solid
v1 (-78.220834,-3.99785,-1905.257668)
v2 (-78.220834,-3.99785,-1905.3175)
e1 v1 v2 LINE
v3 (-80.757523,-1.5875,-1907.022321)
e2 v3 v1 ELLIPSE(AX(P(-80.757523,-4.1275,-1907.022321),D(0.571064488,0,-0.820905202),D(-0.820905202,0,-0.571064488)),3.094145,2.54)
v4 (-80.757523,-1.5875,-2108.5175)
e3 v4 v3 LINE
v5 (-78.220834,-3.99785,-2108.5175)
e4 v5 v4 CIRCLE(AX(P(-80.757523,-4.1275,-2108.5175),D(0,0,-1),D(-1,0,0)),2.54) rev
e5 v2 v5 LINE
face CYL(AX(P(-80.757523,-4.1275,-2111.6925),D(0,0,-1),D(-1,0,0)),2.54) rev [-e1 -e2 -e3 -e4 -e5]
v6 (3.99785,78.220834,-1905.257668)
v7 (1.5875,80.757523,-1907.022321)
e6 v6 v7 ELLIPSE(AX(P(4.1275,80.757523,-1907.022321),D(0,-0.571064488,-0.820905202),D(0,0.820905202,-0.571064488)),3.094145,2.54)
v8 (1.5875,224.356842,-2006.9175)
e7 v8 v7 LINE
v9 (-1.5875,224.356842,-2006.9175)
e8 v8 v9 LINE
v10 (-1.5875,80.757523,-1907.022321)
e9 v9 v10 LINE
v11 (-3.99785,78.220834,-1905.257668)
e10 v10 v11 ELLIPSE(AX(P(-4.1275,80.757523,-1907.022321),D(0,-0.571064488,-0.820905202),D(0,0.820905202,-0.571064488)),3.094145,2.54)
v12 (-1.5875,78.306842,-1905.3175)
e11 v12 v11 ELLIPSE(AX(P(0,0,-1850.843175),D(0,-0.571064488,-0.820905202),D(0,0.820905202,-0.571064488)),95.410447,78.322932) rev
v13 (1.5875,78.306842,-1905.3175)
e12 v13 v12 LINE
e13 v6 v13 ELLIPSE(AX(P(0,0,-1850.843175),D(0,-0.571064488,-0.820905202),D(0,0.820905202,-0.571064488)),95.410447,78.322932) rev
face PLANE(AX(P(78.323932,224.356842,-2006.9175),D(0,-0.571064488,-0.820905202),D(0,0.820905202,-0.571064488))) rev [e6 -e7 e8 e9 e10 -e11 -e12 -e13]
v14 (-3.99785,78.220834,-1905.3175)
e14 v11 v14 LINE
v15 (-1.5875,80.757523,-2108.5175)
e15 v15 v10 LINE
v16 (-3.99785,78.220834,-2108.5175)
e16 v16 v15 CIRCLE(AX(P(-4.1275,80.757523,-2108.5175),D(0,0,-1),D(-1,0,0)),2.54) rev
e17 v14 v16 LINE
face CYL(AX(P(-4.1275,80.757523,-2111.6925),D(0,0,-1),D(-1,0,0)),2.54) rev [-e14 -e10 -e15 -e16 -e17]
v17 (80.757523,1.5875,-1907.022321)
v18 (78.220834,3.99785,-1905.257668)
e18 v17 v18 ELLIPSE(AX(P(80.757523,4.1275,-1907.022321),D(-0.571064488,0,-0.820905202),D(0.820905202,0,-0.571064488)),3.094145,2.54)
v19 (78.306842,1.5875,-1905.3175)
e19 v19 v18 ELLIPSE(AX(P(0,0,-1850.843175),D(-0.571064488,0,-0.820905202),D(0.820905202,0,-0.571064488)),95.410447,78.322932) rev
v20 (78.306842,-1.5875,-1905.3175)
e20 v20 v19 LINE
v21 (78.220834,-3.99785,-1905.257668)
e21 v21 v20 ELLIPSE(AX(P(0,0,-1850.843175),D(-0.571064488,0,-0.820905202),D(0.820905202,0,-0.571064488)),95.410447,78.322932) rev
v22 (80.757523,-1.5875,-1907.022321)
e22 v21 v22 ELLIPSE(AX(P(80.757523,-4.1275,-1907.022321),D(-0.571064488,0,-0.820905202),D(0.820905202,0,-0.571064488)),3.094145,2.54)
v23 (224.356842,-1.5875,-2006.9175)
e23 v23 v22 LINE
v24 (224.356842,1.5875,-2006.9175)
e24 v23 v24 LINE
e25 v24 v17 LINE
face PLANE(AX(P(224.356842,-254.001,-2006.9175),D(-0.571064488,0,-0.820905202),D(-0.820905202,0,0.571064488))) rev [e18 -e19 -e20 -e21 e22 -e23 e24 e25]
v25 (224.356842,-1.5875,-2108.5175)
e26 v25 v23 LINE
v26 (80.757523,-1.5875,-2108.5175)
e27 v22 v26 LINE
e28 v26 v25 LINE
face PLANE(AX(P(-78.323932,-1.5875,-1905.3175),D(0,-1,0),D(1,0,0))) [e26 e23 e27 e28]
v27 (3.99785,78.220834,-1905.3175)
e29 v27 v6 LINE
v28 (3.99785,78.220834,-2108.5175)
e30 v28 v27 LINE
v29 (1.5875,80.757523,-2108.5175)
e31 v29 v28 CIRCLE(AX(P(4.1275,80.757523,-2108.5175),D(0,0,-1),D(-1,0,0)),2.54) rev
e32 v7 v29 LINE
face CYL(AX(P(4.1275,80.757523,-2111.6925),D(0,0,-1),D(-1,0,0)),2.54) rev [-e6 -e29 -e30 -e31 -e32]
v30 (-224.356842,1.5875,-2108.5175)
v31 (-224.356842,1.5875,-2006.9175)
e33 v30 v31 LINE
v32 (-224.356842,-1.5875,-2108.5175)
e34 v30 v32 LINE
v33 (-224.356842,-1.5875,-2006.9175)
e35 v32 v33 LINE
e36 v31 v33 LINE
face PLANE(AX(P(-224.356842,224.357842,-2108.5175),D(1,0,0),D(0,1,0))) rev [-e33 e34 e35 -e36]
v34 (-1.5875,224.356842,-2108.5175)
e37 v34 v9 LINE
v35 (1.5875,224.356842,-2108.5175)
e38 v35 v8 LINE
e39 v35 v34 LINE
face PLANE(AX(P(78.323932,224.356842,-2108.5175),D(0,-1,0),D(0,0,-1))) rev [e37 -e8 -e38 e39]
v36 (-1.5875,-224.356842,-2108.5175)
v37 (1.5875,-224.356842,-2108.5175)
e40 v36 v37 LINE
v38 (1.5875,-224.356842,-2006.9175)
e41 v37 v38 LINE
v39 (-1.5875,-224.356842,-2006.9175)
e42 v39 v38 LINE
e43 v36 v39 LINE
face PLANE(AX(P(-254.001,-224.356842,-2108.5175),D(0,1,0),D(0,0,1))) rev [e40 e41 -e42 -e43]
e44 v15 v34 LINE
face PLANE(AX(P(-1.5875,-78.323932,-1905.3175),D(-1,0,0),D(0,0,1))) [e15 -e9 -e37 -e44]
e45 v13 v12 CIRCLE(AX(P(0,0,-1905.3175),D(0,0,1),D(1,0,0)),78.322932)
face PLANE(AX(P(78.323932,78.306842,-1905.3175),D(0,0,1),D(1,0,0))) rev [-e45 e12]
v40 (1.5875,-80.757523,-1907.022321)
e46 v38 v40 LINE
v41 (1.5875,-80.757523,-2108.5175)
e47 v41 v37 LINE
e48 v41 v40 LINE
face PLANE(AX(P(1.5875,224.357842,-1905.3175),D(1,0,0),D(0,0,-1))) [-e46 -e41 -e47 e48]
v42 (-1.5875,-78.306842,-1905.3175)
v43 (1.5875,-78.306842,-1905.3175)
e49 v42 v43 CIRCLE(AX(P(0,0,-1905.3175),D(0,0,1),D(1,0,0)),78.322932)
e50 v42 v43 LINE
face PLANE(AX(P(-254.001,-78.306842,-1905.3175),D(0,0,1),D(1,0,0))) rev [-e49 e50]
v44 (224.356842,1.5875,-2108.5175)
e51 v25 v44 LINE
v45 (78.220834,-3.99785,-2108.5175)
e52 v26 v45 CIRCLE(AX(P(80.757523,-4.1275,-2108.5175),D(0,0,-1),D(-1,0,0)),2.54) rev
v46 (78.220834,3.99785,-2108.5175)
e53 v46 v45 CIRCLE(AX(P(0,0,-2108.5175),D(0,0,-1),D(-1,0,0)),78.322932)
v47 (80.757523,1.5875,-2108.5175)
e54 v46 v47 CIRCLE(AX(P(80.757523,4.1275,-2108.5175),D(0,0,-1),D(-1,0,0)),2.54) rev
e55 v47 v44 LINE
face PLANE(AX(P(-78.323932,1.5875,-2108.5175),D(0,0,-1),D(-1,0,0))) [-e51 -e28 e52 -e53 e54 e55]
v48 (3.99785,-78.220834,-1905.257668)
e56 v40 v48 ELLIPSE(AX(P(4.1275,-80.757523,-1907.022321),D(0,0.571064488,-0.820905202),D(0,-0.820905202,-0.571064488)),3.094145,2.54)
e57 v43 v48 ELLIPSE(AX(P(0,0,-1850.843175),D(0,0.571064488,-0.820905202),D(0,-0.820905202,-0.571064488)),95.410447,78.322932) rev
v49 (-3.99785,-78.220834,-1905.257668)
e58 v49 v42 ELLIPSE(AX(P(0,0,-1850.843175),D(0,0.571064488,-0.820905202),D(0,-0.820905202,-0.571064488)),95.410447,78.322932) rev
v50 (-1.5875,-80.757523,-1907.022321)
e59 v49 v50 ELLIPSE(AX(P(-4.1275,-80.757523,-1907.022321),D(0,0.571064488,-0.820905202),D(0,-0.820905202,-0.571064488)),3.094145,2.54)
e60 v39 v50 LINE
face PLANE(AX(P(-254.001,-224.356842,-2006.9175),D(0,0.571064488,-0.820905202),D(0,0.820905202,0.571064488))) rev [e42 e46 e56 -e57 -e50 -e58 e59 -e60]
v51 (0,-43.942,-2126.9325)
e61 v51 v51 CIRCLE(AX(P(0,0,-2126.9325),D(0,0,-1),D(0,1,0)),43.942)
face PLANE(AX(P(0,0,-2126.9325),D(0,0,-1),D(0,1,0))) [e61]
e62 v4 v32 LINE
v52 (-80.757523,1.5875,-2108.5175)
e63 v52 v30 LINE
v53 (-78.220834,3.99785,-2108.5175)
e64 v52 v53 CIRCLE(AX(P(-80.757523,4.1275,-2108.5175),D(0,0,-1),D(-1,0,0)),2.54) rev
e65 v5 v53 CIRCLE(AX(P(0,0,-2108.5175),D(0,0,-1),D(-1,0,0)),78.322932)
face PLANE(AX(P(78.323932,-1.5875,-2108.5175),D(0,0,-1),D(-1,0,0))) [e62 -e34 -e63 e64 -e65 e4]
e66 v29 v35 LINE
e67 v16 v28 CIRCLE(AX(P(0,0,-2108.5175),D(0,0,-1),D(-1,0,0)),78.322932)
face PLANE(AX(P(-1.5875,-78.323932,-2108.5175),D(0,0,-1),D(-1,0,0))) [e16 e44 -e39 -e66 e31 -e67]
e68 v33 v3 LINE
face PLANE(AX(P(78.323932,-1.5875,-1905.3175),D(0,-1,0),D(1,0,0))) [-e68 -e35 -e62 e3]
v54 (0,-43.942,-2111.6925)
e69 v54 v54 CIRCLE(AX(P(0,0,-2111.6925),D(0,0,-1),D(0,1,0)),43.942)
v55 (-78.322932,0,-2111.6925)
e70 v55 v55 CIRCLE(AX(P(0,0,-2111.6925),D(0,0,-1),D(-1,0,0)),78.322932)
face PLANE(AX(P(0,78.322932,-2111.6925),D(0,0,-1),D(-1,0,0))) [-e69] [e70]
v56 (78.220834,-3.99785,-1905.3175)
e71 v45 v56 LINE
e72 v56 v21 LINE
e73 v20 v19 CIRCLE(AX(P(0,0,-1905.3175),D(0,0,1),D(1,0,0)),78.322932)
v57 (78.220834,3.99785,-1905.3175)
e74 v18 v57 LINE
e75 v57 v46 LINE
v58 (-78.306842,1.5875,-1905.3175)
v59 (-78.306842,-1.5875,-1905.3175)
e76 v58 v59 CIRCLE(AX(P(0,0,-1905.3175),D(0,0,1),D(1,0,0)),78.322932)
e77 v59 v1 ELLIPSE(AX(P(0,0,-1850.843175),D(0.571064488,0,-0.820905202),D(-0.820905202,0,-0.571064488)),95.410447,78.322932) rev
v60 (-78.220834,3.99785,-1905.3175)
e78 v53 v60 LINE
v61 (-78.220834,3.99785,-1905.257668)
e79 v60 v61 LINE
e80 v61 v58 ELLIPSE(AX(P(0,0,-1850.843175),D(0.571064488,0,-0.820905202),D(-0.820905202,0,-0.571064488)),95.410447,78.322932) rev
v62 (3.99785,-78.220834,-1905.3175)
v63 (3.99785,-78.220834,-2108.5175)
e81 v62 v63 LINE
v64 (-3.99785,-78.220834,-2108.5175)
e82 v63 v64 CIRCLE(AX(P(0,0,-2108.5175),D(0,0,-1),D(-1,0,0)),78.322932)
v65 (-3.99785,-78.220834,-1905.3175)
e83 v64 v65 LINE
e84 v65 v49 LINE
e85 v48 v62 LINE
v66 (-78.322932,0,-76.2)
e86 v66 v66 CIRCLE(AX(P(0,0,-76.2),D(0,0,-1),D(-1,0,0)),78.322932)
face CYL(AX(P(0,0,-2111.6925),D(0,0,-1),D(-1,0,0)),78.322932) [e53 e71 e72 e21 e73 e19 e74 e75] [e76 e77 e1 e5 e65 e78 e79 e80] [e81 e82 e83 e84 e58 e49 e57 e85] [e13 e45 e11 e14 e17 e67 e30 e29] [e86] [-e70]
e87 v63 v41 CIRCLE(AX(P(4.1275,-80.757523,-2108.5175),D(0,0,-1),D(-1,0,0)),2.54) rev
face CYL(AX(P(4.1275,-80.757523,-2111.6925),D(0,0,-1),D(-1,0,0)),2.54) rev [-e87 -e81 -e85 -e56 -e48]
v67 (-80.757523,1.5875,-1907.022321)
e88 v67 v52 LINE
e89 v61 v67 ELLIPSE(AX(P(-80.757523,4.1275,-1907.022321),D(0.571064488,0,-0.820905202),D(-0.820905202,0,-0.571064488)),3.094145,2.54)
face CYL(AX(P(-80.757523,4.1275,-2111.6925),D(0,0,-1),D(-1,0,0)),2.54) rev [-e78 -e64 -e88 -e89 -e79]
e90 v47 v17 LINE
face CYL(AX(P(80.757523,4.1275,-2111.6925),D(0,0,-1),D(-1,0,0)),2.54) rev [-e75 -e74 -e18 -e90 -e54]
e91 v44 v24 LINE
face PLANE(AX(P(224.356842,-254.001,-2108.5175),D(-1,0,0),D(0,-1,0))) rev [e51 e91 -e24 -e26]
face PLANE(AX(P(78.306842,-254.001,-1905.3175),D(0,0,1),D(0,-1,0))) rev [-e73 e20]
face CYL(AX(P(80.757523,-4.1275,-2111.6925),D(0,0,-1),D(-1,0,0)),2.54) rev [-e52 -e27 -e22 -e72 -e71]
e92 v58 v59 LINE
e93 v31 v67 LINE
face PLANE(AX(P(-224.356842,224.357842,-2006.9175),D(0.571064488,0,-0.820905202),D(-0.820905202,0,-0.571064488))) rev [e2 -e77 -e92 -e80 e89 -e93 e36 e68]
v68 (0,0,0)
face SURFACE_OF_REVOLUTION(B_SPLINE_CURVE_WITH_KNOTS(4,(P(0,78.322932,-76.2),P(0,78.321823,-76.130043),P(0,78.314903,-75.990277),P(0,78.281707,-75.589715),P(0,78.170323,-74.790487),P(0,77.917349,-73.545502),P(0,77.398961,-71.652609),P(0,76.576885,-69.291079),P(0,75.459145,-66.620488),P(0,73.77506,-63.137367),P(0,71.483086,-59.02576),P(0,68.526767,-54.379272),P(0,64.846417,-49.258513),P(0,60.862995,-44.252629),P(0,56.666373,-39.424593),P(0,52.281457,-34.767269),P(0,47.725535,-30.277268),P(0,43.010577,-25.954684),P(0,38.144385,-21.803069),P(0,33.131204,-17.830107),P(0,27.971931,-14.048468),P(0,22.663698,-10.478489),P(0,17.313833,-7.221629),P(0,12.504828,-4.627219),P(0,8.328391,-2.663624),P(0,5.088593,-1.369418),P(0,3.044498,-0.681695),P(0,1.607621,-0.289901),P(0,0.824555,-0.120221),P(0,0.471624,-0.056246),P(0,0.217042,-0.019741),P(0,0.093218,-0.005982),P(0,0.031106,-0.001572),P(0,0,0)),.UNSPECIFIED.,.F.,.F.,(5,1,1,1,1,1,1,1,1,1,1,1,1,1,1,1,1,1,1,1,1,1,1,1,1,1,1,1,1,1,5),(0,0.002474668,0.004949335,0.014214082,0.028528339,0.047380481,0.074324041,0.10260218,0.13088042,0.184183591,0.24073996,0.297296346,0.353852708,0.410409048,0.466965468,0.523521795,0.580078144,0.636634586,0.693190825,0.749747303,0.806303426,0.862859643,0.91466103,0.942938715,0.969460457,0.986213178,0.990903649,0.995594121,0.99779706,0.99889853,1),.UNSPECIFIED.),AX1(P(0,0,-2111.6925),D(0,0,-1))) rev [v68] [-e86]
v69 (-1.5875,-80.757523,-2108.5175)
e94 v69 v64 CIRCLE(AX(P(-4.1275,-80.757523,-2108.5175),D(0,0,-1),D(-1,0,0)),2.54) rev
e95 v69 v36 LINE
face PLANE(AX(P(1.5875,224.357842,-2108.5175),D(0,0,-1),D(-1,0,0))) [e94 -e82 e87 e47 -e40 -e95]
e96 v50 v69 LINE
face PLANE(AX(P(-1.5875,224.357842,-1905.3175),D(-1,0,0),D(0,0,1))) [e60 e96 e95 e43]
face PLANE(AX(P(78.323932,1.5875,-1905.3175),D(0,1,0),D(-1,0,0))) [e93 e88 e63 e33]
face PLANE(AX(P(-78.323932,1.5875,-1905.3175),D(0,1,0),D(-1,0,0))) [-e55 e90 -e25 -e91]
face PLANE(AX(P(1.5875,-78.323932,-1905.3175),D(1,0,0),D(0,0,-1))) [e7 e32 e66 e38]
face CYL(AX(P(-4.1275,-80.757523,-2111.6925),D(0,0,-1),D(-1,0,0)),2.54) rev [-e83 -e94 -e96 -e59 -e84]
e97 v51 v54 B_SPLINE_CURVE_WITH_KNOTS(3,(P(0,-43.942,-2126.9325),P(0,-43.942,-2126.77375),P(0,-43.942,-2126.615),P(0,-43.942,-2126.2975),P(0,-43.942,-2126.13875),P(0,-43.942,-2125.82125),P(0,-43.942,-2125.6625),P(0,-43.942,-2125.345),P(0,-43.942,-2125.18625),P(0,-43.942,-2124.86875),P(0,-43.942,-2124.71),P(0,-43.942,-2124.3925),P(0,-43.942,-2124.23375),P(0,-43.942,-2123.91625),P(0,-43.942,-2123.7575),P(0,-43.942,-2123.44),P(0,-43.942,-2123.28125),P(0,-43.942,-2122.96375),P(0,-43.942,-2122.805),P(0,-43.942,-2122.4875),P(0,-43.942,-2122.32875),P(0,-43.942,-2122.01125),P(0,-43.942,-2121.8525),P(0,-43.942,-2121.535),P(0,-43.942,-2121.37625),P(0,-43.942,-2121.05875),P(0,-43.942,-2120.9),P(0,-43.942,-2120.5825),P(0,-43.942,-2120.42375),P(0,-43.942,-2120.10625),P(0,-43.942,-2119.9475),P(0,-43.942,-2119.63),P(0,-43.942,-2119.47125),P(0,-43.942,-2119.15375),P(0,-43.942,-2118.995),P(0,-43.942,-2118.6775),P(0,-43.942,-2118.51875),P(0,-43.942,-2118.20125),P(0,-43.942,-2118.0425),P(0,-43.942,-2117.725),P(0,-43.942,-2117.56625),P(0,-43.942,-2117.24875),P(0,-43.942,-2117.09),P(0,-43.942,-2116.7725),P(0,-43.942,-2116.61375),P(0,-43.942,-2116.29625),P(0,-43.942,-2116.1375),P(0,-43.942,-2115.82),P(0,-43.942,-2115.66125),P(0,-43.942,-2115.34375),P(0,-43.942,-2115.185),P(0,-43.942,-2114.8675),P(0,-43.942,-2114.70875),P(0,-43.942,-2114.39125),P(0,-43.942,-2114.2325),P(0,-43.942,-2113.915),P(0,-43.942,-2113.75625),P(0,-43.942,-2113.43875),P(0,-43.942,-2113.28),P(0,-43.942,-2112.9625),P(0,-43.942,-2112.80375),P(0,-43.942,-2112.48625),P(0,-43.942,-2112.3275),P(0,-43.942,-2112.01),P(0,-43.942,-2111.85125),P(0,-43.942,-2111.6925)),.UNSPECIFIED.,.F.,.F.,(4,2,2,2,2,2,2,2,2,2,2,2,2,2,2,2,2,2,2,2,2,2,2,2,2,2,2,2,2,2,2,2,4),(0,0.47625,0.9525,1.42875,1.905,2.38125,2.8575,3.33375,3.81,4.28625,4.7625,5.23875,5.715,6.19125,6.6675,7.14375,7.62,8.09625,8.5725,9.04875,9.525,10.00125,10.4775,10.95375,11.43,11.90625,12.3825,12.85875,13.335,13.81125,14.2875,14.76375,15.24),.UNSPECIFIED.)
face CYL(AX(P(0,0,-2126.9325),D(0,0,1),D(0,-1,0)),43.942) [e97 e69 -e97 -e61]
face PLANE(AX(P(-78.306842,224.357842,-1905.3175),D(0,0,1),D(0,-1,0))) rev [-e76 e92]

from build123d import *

# Parameters (mm, degrees)
SKETCH3_R                = 43.942
BOSS_EXTRUDE1_DEPTH      = 15.24
BOSS_EXTRUDE2_REACH      = 2156.162
BOSS_EXTRUDE2_END_RADIUS = 78.322932
SKETCH4_W                = 3.175
SKETCH4_H                = 203.2
CUT_EXTRUDE1_REACH       = 2145.535
FILLET1_R                = 2.54
CIRPATTERN1_COUNT        = 4
FILLET1_OF_CIRPATTERN1_R = 2.54


with BuildPart() as part:
    # Sketch2 → Revolve1 (revolve)
    with BuildSketch(Plane(origin=(0, 0, 0), x_dir=(0, 0, -1), z_dir=(1, 0, 0)), mode=Mode.PRIVATE) as revolve1_sk:
        with BuildLine():
            Line((76.2, 78.322932), (2111.6925, 78.322932))
            Line((2111.6925, 78.322932), (2111.6925, 0))
            Line((2111.6925, 0), (0, 0))
            add(Edge.make_bspline(
                [(0, 0), (0.00157185, 0.031106382), (0.00598179, 0.093218427), (0.019741162, 0.217041654), (0.056245749, 0.471623897), (0.120220676, 0.824555102), (0.289900607, 1.607620967), (0.681695021, 3.044497502), (1.369417811, 5.088592926), (2.663624448, 8.328390532), (4.627219491, 12.504828431), (7.221628503, 17.313832891), (10.478488809, 22.663697626), (14.048468312, 27.97193092), (17.830107282, 33.131203754), (21.803068789, 38.144384751), (25.954684106, 43.010577273), (30.277267993, 47.72553477), (34.76726888, 52.281456881), (39.424593478, 56.666373482), (44.252629149, 60.862995207), (49.25851273, 64.846416869), (54.379271658, 68.526766678), (59.025760285, 71.483086359), (63.137367168, 73.775059871), (66.620488281, 75.459145189), (69.291079417, 76.576884505), (71.652609302, 77.398960624), (73.545502358, 77.917349185), (74.790486934, 78.170322816), (75.589714748, 78.281706661), (75.99027716, 78.31490275), (76.130043485, 78.321823203), (76.2, 78.322932)],
                knots=[0, 0, 0, 0, 0, 0.00110147, 0.00220294, 0.004405879, 0.009096351, 0.013786822, 0.030539543, 0.057061285, 0.08533897, 0.137140357, 0.193696574, 0.250252697, 0.306809175, 0.363365414, 0.419921856, 0.476478205, 0.533034532, 0.589590952, 0.646147292, 0.702703654, 0.75926004, 0.815816409, 0.86911958, 0.89739782, 0.925675959, 0.952619519, 0.971471661, 0.985785918, 0.995050665, 0.997525332, 1, 1, 1, 1, 1], degree=4))
        make_face()
    revolve(revolve1_sk.sketch.rotate(Axis((0, 0, -2111.6925), (0, 0, 1)), 90), axis=Axis((0, 0, -2111.6925), (0, 0, 1)))

    # Sketch3 → Boss-Extrude1 (add)
    with BuildSketch(Plane(origin=(0, 0, -2111.6925), x_dir=(-1, 0, 0), z_dir=(0, 0, -1))):
        with Locations(Location((0, 0, 0), (0, 0, 270))):
            Circle(SKETCH3_R)
    extrude(amount=BOSS_EXTRUDE1_DEPTH)

    # Boss-Extrude2: up to this cylinder (the profile starts outside it)
    boss_extrude2_end = Plane(origin=(0, 0, -2006.9175), z_dir=(0, 0, -1)) * Cylinder(BOSS_EXTRUDE2_END_RADIUS, 4469.969864, mode=Mode.PRIVATE)
    # Sketch4 → Boss-Extrude2 (add, up to the surface)
    with BuildSketch(Plane(origin=(0, 254, 0), x_dir=(1, 0, 0), z_dir=(0, 1, 0)), mode=Mode.PRIVATE) as boss_extrude2_sk1:
        with Locations((0, 2006.9175)):
            Rectangle(SKETCH4_W, SKETCH4_H)
    boss_extrude2_tool1 = extrude(boss_extrude2_sk1.sketch, amount=-BOSS_EXTRUDE2_REACH, mode=Mode.PRIVATE) - boss_extrude2_end
    boss_extrude2 = boss_extrude2_tool1.solids().sort_by_distance((0, 254, -2006.9175))[0]
    add(boss_extrude2)

    # Sketch5 → Cut-Extrude1 (cut, up to next)
    with BuildSketch(Plane.ZY.offset(1.5875), mode=Mode.PRIVATE) as cut_extrude1_sk1:
        Polygon((-2108.5175, 224.356842107), (-2006.9175, 224.356842107), (-1905.3175, 78.306842107), (-1905.3175, 254), (-2108.5175, 254), align=None)
    cut_extrude1_tool1 = extrude(cut_extrude1_sk1.sketch, amount=-CUT_EXTRUDE1_REACH, mode=Mode.PRIVATE) & part.part
    cut_extrude1 = cut_extrude1_tool1.solids().sort_by_distance((-1.5875, 204.128915, -1969.534252))[0]
    add(cut_extrude1, mode=Mode.SUBTRACT)

    # Fillet1
    # the kernel refuses this fillet: 2.54 mm, written as the material it adds along each edge
    with BuildSketch(Plane(origin=(-1.5875, 78.306842107, -1899.190797857), x_dir=(-0.9993639751499004, -0.03566013422001241, 0), z_dir=(0, 0, -1))) as fillet1_piece_1_section:
        with BuildLine():
            CenterArc((2.450992889, 2.539698904), FILLET1_R, 182.043608468, 87.074170625)
            Line((-0.087391608, 2.449122163), (0, 0))
            ThreePointArc((0, 0), (1.205942189, 0.009284527), (2.411884379, 0))
        make_face()
    fillet1_piece_1 = extrude(amount=209.326702143, mode=Mode.PRIVATE)
    fillet1_piece_1 = split(fillet1_piece_1, bisect_by=Plane(origin=(-3.095055571, 78.248638535, -1905.277010558), z_dir=(0, -0.5710644881985995, -0.8209052017854874)), keep=Keep.TOP, mode=Mode.PRIVATE)
    add(fillet1_piece_1)
    with BuildSketch(Plane(origin=(1.5875, 78.306842107, -1899.190797857), x_dir=(0.9993639751499004, -0.035660134220013434, 0), z_dir=(0, 0, -1))) as fillet1_piece_2_section:
        with BuildLine():
            CenterArc((2.450992889, -2.539698904), FILLET1_R, 90.882220907, 87.074170625)
            Line((-0.087391608, -2.449122163), (0, 0))
            ThreePointArc((0, 0), (1.205942189, -0.009284527), (2.411884379, 0))
        make_face()
    fillet1_piece_2 = extrude(amount=209.326702143, mode=Mode.PRIVATE)
    fillet1_piece_2 = split(fillet1_piece_2, bisect_by=Plane(origin=(3.095055571, 78.248638535, -1905.277010558), z_dir=(0, -0.5710644881985995, -0.8209052017854874)), keep=Keep.TOP, mode=Mode.PRIVATE)
    add(fillet1_piece_2)

    # CirPattern1: Boss-Extrude2, Cut-Extrude1 ×4 about axis
    cirpattern1_axis = Axis((0, 0, 0), (0, 0, 1))
    add([boss_extrude2.rotate(cirpattern1_axis, i * 360 / CIRPATTERN1_COUNT) for i in range(1, CIRPATTERN1_COUNT)])
    add([cut_extrude1.rotate(cirpattern1_axis, i * 360 / CIRPATTERN1_COUNT) for i in range(1, CIRPATTERN1_COUNT)], mode=Mode.SUBTRACT)

    # Fillet1 of CirPattern1
    # the kernel refuses this fillet: 2.54 mm, written as the material it adds along each edge
    with BuildSketch(Plane(origin=(-78.306842107, -1.5875, -1899.190797857), x_dir=(0.03566013422001848, -0.9993639751499002, 0), z_dir=(0, 0, -1))) as fillet1_of_cirpattern1_piece_1_section:
        with BuildLine():
            CenterArc((2.450992889, 2.539698904), FILLET1_OF_CIRPATTERN1_R, 182.043608468, 87.074170625)
            Line((-0.087391608, 2.449122163), (0, 0))
            ThreePointArc((0, 0), (1.205942189, 0.009284527), (2.411884379, 0))
        make_face()
    fillet1_of_cirpattern1_piece_1 = extrude(amount=209.326702143, mode=Mode.PRIVATE)
    fillet1_of_cirpattern1_piece_1 = split(fillet1_of_cirpattern1_piece_1, bisect_by=Plane(origin=(-78.248638535, -3.095055571, -1905.277010558), z_dir=(0.5710644881985995, 0, -0.8209052017854874)), keep=Keep.TOP, mode=Mode.PRIVATE)
    add(fillet1_of_cirpattern1_piece_1)
    with BuildSketch(Plane(origin=(-78.306842107, 1.5875, -1899.190797857), x_dir=(0.03566013422001241, 0.9993639751499004, 0), z_dir=(0, 0, -1))) as fillet1_of_cirpattern1_piece_2_section:
        with BuildLine():
            CenterArc((2.450992889, -2.539698904), FILLET1_OF_CIRPATTERN1_R, 90.882220907, 87.074170625)
            Line((-0.087391608, -2.449122163), (0, 0))
            ThreePointArc((0, 0), (1.205942189, -0.009284527), (2.411884379, 0))
        make_face()
    fillet1_of_cirpattern1_piece_2 = extrude(amount=209.326702143, mode=Mode.PRIVATE)
    fillet1_of_cirpattern1_piece_2 = split(fillet1_of_cirpattern1_piece_2, bisect_by=Plane(origin=(-78.248638535, 3.095055571, -1905.277010558), z_dir=(0.5710644881985995, 0, -0.8209052017854874)), keep=Keep.TOP, mode=Mode.PRIVATE)
    add(fillet1_of_cirpattern1_piece_2)
    with BuildSketch(Plane(origin=(1.5875, -78.306842107, -1899.190797857), x_dir=(0.9993639751499002, 0.035660134220018555, 0), z_dir=(0, 0, -1))) as fillet1_of_cirpattern1_piece_3_section:
        with BuildLine():
            CenterArc((2.450992889, 2.539698904), FILLET1_OF_CIRPATTERN1_R, 182.043608468, 87.074170625)
            Line((-0.087391608, 2.449122163), (0, 0))
            ThreePointArc((0, 0), (1.205942189, 0.009284527), (2.411884379, 0))
        make_face()
    fillet1_of_cirpattern1_piece_3 = extrude(amount=209.326702143, mode=Mode.PRIVATE)
    fillet1_of_cirpattern1_piece_3 = split(fillet1_of_cirpattern1_piece_3, bisect_by=Plane(origin=(3.095055571, -78.248638535, -1905.277010558), z_dir=(0, 0.5710644881985995, -0.8209052017854874)), keep=Keep.TOP, mode=Mode.PRIVATE)
    add(fillet1_of_cirpattern1_piece_3)
    with BuildSketch(Plane(origin=(-1.5875, -78.306842107, -1899.190797857), x_dir=(-0.9993639751499004, 0.03566013422001239, 0), z_dir=(0, 0, -1))) as fillet1_of_cirpattern1_piece_4_section:
        with BuildLine():
            CenterArc((2.450992889, -2.539698904), FILLET1_OF_CIRPATTERN1_R, 90.882220907, 87.074170625)
            Line((-0.087391608, -2.449122163), (0, 0))
            ThreePointArc((0, 0), (1.205942189, -0.009284527), (2.411884379, 0))
        make_face()
    fillet1_of_cirpattern1_piece_4 = extrude(amount=209.326702143, mode=Mode.PRIVATE)
    fillet1_of_cirpattern1_piece_4 = split(fillet1_of_cirpattern1_piece_4, bisect_by=Plane(origin=(-3.095055571, -78.248638535, -1905.277010558), z_dir=(0, 0.5710644881985995, -0.8209052017854874)), keep=Keep.TOP, mode=Mode.PRIVATE)
    add(fillet1_of_cirpattern1_piece_4)
    with BuildSketch(Plane(origin=(78.306842107, 1.5875, -1899.190797857), x_dir=(-0.03566013422001829, 0.9993639751499002, 0), z_dir=(0, 0, -1))) as fillet1_of_cirpattern1_piece_5_section:
        with BuildLine():
            CenterArc((2.450992889, 2.539698904), FILLET1_OF_CIRPATTERN1_R, 182.043608468, 87.074170625)
            Line((-0.087391608, 2.449122163), (0, 0))
            ThreePointArc((0, 0), (1.205942189, 0.009284527), (2.411884379, 0))
        make_face()
    fillet1_of_cirpattern1_piece_5 = extrude(amount=209.326702143, mode=Mode.PRIVATE)
    fillet1_of_cirpattern1_piece_5 = split(fillet1_of_cirpattern1_piece_5, bisect_by=Plane(origin=(78.248638535, 3.095055571, -1905.277010558), z_dir=(-0.5710644881985995, 0, -0.8209052017854874)), keep=Keep.TOP, mode=Mode.PRIVATE)
    add(fillet1_of_cirpattern1_piece_5)
    with BuildSketch(Plane(origin=(78.306842107, -1.5875, -1899.190797857), x_dir=(-0.0356601342200124, -0.9993639751499004, 0), z_dir=(0, 0, -1))) as fillet1_of_cirpattern1_piece_6_section:
        with BuildLine():
            CenterArc((2.450992889, -2.539698904), FILLET1_OF_CIRPATTERN1_R, 90.882220907, 87.074170625)
            Line((-0.087391608, -2.449122163), (0, 0))
            ThreePointArc((0, 0), (1.205942189, -0.009284527), (2.411884379, 0))
        make_face()
    fillet1_of_cirpattern1_piece_6 = extrude(amount=209.326702143, mode=Mode.PRIVATE)
    fillet1_of_cirpattern1_piece_6 = split(fillet1_of_cirpattern1_piece_6, bisect_by=Plane(origin=(78.248638535, -3.095055571, -1905.277010558), z_dir=(-0.5710644881985995, 0, -0.8209052017854874)), keep=Keep.TOP, mode=Mode.PRIVATE)
    add(fillet1_of_cirpattern1_piece_6)


solid = part.part
